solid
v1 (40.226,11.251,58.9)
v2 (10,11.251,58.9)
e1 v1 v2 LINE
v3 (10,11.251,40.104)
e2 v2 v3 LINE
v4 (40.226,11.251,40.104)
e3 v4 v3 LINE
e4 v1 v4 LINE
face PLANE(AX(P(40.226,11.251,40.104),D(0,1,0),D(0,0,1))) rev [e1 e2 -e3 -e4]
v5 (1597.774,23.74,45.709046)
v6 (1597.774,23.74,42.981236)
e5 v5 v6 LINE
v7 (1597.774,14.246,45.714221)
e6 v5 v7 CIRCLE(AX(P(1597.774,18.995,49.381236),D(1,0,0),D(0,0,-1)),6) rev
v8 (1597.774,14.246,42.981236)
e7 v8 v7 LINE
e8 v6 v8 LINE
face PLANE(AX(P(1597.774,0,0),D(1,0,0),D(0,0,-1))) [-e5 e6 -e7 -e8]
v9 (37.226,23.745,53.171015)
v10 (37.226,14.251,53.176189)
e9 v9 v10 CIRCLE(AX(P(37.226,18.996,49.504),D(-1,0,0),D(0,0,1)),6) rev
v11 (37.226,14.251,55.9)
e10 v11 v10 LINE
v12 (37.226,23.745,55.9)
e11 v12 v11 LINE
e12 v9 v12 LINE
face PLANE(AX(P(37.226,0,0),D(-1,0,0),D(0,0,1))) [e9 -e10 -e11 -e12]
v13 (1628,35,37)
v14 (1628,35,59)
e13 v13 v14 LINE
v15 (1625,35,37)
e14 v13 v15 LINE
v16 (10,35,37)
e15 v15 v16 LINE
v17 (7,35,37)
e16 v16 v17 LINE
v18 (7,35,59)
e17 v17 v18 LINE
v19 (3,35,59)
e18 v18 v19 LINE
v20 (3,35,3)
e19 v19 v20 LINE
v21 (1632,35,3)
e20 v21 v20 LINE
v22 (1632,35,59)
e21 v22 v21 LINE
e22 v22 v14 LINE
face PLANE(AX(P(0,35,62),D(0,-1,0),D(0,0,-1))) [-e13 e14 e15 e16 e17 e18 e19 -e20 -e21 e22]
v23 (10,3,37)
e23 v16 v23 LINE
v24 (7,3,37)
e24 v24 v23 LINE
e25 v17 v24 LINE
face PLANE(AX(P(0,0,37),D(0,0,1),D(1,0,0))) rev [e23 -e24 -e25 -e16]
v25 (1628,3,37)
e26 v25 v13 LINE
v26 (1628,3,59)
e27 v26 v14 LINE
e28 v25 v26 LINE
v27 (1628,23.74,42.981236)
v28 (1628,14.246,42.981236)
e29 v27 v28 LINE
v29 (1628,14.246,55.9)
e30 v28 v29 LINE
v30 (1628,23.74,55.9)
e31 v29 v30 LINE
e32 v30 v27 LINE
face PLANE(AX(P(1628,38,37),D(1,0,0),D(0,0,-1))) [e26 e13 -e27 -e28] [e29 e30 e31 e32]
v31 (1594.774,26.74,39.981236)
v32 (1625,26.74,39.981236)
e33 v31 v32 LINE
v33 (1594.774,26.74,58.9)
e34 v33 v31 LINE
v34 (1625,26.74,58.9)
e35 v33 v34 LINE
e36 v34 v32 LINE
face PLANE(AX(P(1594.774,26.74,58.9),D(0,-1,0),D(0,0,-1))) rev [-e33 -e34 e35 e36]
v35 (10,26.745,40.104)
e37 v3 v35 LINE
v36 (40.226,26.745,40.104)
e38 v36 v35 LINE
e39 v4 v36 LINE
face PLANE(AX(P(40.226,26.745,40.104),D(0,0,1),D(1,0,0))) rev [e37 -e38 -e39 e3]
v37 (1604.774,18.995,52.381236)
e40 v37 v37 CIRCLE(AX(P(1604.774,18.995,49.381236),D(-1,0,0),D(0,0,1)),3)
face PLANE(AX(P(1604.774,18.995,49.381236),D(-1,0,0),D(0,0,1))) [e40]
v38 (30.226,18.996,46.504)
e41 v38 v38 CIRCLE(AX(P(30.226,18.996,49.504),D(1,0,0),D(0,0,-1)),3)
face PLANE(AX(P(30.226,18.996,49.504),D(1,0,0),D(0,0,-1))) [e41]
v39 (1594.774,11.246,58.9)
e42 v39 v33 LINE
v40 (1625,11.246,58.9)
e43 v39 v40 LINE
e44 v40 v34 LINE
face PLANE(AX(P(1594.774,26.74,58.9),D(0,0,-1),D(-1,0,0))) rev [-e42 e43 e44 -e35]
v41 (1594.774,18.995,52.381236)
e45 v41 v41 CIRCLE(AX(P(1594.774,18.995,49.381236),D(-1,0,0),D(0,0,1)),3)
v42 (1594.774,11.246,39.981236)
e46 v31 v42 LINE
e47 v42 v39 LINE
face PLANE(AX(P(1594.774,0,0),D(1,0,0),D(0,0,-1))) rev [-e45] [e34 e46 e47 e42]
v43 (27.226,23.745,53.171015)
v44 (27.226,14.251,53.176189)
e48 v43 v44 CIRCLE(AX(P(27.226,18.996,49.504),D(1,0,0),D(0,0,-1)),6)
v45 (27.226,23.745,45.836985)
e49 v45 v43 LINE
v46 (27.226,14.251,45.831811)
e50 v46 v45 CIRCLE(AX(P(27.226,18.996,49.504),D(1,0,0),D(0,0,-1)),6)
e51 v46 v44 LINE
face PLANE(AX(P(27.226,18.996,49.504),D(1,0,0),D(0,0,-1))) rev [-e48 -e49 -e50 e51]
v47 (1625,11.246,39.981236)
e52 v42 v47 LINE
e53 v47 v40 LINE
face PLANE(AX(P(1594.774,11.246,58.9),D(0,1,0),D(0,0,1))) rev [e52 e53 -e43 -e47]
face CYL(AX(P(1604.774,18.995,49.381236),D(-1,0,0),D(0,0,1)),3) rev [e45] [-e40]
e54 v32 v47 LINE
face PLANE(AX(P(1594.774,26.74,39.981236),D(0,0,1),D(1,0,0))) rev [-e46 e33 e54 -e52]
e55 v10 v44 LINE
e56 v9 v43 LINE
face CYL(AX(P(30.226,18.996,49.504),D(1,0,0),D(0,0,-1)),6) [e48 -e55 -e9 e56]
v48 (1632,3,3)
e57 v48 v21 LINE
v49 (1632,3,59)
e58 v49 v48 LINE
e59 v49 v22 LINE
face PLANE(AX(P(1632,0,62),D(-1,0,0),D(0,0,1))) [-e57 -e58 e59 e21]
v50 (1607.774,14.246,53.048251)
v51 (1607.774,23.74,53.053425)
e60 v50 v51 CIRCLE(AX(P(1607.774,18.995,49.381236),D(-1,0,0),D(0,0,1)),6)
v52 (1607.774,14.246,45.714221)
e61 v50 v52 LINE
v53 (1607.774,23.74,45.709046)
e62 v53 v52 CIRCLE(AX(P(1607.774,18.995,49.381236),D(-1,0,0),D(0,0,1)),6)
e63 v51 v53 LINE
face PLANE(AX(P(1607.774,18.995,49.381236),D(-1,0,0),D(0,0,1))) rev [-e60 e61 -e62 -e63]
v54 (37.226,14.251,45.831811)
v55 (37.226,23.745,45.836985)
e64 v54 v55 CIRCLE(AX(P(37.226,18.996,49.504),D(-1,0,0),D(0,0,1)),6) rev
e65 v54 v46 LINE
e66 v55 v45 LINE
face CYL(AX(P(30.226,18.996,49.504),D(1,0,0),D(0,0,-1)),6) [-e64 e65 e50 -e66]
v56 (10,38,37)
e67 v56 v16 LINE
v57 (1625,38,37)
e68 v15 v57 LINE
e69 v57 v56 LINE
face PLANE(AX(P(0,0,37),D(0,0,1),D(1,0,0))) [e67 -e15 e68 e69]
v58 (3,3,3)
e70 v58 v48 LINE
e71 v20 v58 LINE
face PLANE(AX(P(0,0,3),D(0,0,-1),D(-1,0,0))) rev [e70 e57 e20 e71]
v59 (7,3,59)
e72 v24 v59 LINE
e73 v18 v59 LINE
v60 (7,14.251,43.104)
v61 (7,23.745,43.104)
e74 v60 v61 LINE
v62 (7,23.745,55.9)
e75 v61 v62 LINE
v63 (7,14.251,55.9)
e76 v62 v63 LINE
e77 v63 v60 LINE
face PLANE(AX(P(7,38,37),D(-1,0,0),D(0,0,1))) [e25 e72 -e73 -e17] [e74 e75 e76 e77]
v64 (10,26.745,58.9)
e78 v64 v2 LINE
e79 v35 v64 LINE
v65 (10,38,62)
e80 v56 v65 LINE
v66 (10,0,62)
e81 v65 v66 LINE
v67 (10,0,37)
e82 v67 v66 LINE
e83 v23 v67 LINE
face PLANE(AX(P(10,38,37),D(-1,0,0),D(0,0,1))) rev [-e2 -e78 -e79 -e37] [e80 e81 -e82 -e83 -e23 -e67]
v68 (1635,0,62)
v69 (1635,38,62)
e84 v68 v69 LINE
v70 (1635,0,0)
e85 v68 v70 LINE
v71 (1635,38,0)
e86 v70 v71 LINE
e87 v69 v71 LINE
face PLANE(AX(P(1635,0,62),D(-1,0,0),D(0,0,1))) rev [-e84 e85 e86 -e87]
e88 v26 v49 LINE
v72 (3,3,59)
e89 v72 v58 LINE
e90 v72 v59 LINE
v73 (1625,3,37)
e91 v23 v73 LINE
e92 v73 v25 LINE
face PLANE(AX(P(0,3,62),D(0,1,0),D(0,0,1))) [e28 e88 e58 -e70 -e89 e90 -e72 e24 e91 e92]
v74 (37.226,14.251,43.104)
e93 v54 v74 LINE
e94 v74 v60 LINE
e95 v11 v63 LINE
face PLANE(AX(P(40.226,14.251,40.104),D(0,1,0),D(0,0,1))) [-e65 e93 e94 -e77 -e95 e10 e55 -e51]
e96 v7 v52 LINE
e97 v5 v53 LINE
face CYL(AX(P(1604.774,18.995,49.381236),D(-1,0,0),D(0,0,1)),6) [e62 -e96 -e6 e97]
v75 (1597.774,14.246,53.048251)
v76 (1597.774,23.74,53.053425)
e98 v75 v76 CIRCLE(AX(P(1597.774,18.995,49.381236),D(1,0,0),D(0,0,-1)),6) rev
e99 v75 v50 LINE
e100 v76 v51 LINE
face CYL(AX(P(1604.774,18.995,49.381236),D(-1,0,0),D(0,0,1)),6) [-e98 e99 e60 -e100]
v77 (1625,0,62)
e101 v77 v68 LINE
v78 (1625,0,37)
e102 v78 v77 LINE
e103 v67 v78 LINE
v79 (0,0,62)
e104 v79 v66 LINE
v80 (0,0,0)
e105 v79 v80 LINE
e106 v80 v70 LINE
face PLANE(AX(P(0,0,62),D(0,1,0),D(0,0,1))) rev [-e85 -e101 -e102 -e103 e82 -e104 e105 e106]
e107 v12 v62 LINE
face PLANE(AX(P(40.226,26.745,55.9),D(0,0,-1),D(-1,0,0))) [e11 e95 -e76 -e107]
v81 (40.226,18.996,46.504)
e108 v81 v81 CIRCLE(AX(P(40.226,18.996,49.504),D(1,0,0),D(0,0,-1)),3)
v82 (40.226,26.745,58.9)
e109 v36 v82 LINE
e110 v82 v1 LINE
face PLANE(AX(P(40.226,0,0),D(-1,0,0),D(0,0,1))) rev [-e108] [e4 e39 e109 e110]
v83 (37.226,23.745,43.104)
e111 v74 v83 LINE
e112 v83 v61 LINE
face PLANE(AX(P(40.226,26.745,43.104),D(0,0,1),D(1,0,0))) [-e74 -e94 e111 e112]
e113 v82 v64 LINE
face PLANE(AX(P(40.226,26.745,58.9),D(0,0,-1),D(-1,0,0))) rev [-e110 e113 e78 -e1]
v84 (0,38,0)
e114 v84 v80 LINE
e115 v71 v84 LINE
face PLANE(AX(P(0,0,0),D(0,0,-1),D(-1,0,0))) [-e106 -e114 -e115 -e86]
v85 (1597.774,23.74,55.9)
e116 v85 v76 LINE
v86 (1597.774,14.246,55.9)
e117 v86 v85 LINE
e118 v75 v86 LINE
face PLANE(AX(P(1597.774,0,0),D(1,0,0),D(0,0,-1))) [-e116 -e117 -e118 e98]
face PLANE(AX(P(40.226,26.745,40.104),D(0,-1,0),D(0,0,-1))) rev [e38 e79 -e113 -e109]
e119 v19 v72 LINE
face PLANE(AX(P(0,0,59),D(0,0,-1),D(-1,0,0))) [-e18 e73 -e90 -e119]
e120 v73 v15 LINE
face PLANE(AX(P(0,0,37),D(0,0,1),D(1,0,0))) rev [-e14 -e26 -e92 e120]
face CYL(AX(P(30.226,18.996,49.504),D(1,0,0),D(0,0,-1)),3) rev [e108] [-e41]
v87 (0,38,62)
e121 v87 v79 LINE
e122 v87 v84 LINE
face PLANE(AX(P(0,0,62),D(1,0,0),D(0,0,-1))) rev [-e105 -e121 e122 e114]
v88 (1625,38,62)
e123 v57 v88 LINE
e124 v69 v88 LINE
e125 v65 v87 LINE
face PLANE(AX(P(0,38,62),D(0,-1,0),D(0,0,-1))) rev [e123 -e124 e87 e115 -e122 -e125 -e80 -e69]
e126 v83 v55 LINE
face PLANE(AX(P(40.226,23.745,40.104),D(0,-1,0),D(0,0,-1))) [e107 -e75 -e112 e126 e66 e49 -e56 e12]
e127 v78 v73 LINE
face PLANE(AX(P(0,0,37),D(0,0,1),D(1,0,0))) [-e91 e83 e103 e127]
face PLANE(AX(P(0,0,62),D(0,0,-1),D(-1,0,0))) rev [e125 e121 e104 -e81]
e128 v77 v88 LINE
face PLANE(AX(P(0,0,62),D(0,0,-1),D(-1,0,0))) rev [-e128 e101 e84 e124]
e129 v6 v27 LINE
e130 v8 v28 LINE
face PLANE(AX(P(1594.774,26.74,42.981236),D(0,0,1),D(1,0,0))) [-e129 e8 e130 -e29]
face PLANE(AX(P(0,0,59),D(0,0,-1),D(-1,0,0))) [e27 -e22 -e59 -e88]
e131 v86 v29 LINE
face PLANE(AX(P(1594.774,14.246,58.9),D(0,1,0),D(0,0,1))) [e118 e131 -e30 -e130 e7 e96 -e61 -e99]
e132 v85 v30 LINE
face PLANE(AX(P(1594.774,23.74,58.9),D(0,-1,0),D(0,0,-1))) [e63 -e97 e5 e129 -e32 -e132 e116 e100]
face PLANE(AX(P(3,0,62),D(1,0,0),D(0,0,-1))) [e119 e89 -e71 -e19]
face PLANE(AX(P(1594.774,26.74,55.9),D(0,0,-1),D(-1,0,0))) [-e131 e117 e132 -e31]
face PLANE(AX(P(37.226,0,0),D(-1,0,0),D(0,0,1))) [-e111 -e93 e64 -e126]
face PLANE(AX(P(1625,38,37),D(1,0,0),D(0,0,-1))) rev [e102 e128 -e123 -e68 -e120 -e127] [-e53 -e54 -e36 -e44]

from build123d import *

# Parameters (mm, degrees)
SKETCH1_W            = 1635
SKETCH1_H            = 38
BOSS_EXTRUDE1_DEPTH  = 62
SKETCH2_W            = 1615
SKETCH2_H            = 38
CUT_EXTRUDE1_DEPTH   = 25
SKETCH3_W            = 18.796
SKETCH3_H            = 15.494
BOSS_EXTRUDE2_DEPTH  = 30.226
SKETCH5_W            = 18.91876422
SKETCH5_H            = 15.494
BOSS_EXTRUDE3_DEPTH  = 30.226
SKETCH6_R            = 3
CUT_EXTRUDE2_DEPTH   = 10
SKETCH7_R            = 3
CUT_EXTRUDE3_DEPTH   = 10
SHELL1_START         = 3
SHELL1_OUTLINE_W     = 32
SHELL1_OUTLINE_H     = 34
SHELL1_DEPTH         = 1629
SHELL1_START_2       = 1607.774
SHELL1_2_OUTLINE_W   = 9.494
SHELL1_2_OUTLINE_H   = 12.91876422
SHELL1_2_DEPTH       = 24.226
SHELL1_3_OUTLINE_W   = 9.494
SHELL1_3_OUTLINE_H   = 12.796
SHELL1_3_DEPTH       = 24.226
SHELL1_4_OUTLINE_W   = 32
SHELL1_4_OUTLINE_H   = 22
SHELL1_4_OUTLINE_W_2 = 9.494
SHELL1_4_OUTLINE_H_2 = 12.796
SHELL1_4_DEPTH       = 4
SHELL1_START_3       = 1628
SHELL1_5_OUTLINE_W   = 32
SHELL1_5_OUTLINE_H   = 22
SHELL1_5_OUTLINE_W_2 = 9.494
SHELL1_5_OUTLINE_H_2 = 12.91876422
SHELL1_5_DEPTH       = 4
SHELL1_START_4       = 1597.774
SHELL1_6_DEPTH       = 10
SHELL1_START_5       = 27.226
SHELL1_7_DEPTH       = 10


# Read off the part's stored shape, not the designer's step: Shell1
with BuildPart() as part:
    # Sketch1 → Boss-Extrude1 (new body)
    with BuildSketch(Plane.XY):
        with Locations((817.5, 19)):
            Rectangle(SKETCH1_W, SKETCH1_H)
    extrude(amount=BOSS_EXTRUDE1_DEPTH)

    # Sketch2 → Cut-Extrude1 (cut)
    with BuildSketch(Plane.XY.offset(62)):
        with Locations((817.5, 19)):
            Rectangle(SKETCH2_W, SKETCH2_H)
    extrude(amount=-CUT_EXTRUDE1_DEPTH, mode=Mode.SUBTRACT)

    # Sketch3 → Boss-Extrude2 (add)
    with BuildSketch(Plane(origin=(10, 0, 0), x_dir=(0, 0, -1), z_dir=(1, 0, 0))):
        with Locations((-49.502, 18.998)):
            Rectangle(SKETCH3_W, SKETCH3_H)
    extrude(amount=BOSS_EXTRUDE2_DEPTH)

    # Sketch5 → Boss-Extrude3 (add)
    with BuildSketch(Plane.ZY.offset(-1625)):
        with Locations((49.44061789, 18.993)):
            Rectangle(SKETCH5_W, SKETCH5_H)
    extrude(amount=BOSS_EXTRUDE3_DEPTH)

    # Sketch6 → Cut-Extrude2 (cut)
    with BuildSketch(Plane(origin=(40.226, 0, 0), x_dir=(0, 0, -1), z_dir=(1, 0, 0))):
        with Locations((-49.504, 18.996)):
            Circle(SKETCH6_R)
    extrude(amount=-CUT_EXTRUDE2_DEPTH, mode=Mode.SUBTRACT)

    # Sketch7 → Cut-Extrude3 (cut)
    with BuildSketch(Plane.ZY.offset(-1594.774)):
        with Locations((49.38123578, 18.995)):
            Circle(SKETCH7_R)
    extrude(amount=-CUT_EXTRUDE3_DEPTH, mode=Mode.SUBTRACT)

    # Shell1 outline → Shell1 (cut)
    with BuildSketch(Plane.YZ.offset(SHELL1_START)):
        with Locations((19, 20)):
            Rectangle(SHELL1_OUTLINE_W, SHELL1_OUTLINE_H)
    extrude(amount=SHELL1_DEPTH, mode=Mode.SUBTRACT)

    # Shell1 2 outline → Shell1 2 (cut)
    with BuildSketch(Plane.YZ.offset(SHELL1_START_2)):
        with Locations((18.993, 49.44061789)):
            Rectangle(SHELL1_2_OUTLINE_W, SHELL1_2_OUTLINE_H)
    extrude(amount=SHELL1_2_DEPTH, mode=Mode.SUBTRACT)

    # Shell1 3 outline → Shell1 3 (cut)
    with BuildSketch(Plane.YZ.offset(SHELL1_START)):
        with Locations((18.998, 49.502)):
            Rectangle(SHELL1_3_OUTLINE_W, SHELL1_3_OUTLINE_H)
    extrude(amount=SHELL1_3_DEPTH, mode=Mode.SUBTRACT)

    # Shell1 4 outline → Shell1 4 (cut)
    with BuildSketch(Plane.YZ.offset(SHELL1_START)):
        with Locations((19, 48)):
            Rectangle(SHELL1_4_OUTLINE_W, SHELL1_4_OUTLINE_H)
        with Locations((18.998, 49.502)):
            Rectangle(SHELL1_4_OUTLINE_W_2, SHELL1_4_OUTLINE_H_2, mode=Mode.SUBTRACT)
    extrude(amount=SHELL1_4_DEPTH, mode=Mode.SUBTRACT)

    # Shell1 5 outline → Shell1 5 (cut)
    with BuildSketch(Plane.YZ.offset(SHELL1_START_3)):
        with Locations((19, 48)):
            Rectangle(SHELL1_5_OUTLINE_W, SHELL1_5_OUTLINE_H)
        with Locations((18.993, 49.44061789)):
            Rectangle(SHELL1_5_OUTLINE_W_2, SHELL1_5_OUTLINE_H_2, mode=Mode.SUBTRACT)
    extrude(amount=SHELL1_5_DEPTH, mode=Mode.SUBTRACT)

    # Shell1 6 outline → Shell1 6 (cut)
    with BuildSketch(Plane.YZ.offset(SHELL1_START_4)):
        with BuildLine():
            Line((23.74, 55.9), (14.246, 55.9))
            Line((14.246, 55.9), (14.246, 53.048250779))
            ThreePointArc((14.246, 53.048250779), (18.991729891, 55.381234889), (23.74, 53.053425182))
            Line((23.74, 53.053425182), (23.74, 55.9))
        make_face()
        with BuildLine():
            ThreePointArc((23.74, 45.709046379), (18.991729891, 43.381236672), (14.246, 45.714220782))
            Line((14.246, 45.714220782), (14.246, 42.98123578))
            Line((14.246, 42.98123578), (23.74, 42.98123578))
            Line((23.74, 42.98123578), (23.74, 45.709046379))
        make_face()
    extrude(amount=SHELL1_6_DEPTH, mode=Mode.SUBTRACT)

    # Shell1 7 outline → Shell1 7 (cut)
    with BuildSketch(Plane.YZ.offset(SHELL1_START_5)):
        with BuildLine():
            Line((23.745, 53.171014999), (23.745, 55.9))
            Line((23.745, 55.9), (14.251, 55.9))
            Line((14.251, 55.9), (14.251, 53.176189401))
            ThreePointArc((14.251, 53.176189401), (18.999270109, 55.503999109), (23.745, 53.171014999))
        make_face()
        with BuildLine():
            Line((23.745, 43.104), (23.745, 45.836985001))
            ThreePointArc((23.745, 45.836985001), (18.999270109, 43.504000891), (14.251, 45.831810599))
            Line((14.251, 45.831810599), (14.251, 43.104))
            Line((14.251, 43.104), (23.745, 43.104))
        make_face()
    extrude(amount=SHELL1_7_DEPTH, mode=Mode.SUBTRACT)


solid = part.part
